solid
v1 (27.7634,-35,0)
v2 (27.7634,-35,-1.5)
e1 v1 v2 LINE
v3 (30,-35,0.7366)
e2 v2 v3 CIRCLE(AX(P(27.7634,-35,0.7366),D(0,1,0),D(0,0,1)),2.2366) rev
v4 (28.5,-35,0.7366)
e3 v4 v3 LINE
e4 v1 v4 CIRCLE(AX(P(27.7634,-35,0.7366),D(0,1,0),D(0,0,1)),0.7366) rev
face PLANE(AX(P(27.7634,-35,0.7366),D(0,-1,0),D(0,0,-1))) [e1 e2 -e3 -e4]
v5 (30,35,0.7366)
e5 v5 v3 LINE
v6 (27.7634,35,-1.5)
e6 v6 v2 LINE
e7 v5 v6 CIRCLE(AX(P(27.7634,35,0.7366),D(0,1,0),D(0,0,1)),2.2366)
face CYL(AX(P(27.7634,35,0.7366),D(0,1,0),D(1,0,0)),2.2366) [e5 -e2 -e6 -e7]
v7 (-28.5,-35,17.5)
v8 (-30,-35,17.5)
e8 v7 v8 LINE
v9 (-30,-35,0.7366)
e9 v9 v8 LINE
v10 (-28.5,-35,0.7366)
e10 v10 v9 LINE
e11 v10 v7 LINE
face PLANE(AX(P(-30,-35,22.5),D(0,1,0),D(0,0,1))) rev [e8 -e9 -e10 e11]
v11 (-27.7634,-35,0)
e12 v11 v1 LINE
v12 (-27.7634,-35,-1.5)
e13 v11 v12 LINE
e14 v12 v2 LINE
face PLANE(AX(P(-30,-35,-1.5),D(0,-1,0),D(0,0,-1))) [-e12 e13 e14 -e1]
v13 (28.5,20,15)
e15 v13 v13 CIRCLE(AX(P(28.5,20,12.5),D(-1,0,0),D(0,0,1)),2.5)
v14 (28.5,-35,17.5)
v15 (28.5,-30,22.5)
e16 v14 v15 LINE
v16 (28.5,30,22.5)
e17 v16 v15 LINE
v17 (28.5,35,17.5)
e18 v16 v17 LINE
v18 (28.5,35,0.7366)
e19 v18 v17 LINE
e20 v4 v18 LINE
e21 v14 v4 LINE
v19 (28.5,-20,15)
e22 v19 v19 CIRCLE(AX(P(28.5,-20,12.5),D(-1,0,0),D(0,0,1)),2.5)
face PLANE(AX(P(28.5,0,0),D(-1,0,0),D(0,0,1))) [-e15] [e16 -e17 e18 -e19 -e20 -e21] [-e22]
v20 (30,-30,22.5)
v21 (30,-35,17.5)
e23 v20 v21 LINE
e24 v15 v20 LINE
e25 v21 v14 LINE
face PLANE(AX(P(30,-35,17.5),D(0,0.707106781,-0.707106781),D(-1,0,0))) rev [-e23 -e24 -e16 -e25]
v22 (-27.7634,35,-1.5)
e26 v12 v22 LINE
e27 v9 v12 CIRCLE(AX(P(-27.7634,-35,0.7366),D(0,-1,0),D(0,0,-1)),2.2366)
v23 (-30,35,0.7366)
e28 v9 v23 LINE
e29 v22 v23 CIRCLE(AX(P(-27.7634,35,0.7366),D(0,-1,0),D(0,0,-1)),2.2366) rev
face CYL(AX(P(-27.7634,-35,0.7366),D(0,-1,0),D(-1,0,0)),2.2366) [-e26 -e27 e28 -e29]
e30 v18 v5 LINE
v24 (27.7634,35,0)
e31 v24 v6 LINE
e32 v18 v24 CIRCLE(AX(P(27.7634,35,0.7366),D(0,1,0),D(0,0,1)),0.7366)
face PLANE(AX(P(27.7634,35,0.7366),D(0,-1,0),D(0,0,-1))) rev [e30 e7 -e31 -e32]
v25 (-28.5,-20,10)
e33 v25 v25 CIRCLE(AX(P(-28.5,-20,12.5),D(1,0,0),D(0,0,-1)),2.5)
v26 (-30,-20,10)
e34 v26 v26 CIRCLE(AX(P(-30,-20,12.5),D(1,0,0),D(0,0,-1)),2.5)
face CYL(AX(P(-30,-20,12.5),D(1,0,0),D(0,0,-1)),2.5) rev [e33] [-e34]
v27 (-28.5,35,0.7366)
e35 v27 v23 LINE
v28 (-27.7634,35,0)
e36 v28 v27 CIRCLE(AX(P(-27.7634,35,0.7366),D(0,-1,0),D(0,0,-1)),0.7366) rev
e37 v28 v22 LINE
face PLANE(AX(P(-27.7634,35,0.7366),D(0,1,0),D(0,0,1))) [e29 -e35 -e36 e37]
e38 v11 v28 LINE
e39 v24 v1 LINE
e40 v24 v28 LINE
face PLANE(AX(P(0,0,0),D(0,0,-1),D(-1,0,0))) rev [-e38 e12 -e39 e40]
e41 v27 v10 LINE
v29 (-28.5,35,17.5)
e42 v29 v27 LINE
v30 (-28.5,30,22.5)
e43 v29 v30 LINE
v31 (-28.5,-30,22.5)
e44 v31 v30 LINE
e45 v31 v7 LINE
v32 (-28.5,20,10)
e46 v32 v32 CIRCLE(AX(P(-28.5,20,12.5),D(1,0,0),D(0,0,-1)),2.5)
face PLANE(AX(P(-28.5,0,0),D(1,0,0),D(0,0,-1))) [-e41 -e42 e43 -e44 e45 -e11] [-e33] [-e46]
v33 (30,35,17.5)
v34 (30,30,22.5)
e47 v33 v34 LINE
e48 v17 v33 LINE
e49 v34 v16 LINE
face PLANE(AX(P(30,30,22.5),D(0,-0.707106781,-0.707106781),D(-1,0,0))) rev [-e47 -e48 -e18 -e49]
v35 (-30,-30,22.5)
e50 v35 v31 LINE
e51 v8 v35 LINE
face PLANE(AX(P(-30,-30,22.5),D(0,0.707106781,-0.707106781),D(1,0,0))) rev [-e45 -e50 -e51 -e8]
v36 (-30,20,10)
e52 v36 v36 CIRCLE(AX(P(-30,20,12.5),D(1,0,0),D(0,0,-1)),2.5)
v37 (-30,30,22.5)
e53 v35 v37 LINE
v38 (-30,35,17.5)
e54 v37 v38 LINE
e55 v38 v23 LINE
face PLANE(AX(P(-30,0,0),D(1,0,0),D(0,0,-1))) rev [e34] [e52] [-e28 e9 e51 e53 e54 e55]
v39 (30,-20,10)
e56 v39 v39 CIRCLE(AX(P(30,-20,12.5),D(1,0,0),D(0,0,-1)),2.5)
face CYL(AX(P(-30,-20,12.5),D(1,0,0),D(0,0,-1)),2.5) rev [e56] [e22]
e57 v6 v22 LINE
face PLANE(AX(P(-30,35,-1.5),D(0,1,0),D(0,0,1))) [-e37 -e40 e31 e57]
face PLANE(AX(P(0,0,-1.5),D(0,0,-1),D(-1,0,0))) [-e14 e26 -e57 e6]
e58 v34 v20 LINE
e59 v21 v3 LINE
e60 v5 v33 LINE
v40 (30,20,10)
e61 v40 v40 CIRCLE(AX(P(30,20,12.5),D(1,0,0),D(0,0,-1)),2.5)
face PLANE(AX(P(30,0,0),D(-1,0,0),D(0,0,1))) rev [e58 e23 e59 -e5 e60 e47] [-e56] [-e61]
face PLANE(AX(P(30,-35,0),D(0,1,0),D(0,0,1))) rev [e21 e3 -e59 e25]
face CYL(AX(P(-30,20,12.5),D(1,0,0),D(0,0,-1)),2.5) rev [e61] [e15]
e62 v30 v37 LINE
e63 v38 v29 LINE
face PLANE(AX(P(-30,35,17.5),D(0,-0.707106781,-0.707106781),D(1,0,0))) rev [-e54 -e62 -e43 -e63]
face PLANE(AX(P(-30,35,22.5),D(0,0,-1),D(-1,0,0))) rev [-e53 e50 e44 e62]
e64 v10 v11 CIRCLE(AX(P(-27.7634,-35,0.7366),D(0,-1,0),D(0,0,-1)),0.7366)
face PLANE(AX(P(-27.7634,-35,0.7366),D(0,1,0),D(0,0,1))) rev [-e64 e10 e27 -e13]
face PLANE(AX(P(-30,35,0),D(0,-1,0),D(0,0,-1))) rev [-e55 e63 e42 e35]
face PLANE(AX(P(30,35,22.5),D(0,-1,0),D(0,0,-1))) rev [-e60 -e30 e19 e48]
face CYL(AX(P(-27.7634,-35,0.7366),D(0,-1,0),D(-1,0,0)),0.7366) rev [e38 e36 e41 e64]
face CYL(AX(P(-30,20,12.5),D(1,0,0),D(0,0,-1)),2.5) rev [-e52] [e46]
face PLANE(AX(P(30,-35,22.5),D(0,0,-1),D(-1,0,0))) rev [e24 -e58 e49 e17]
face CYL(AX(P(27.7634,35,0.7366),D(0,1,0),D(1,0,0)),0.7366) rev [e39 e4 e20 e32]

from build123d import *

# Parameters (mm, degrees)
CROQUIS1_W                         = 60
CROQUIS1_H                         = 70
BRIDA_BASE1_DEPTH                  = 1.5
BRIDA_DE_ARISTA1_STRIP_W           = 7.4732
BRIDA_DE_ARISTA1_STRIP_H           = 1.5
BRIDA_DE_ARISTA1_STRIP_CUT_DEPTH   = 70
BRIDA_DE_ARISTA1_STRIP_2_W         = 7.4732
BRIDA_DE_ARISTA1_STRIP_2_H         = 1.5
BRIDA_DE_ARISTA1_STRIP_CUT_2_DEPTH = 70
BRIDA_DE_ARISTA1_DEPTH             = 70
BRIDA_DE_ARISTA1_BEND_DEPTH        = 70
ROMPER_START                       = -40.658639918
ROMPER_ESQUINA1_OUTLINE_W          = 64
ROMPER_ESQUINA1_OUTLINE_H          = 51.123106012
ROMPER_ESQUINA1_DEPTH              = 3.535533906
ROMPER_START_2                     = 5.303300859
ROMPER_ESQUINA1_2_OUTLINE_W        = 64
ROMPER_ESQUINA1_2_OUTLINE_H        = 3.876893988
ROMPER_ESQUINA1_2_DEPTH            = 7.071067812
CROQUIS16_R                        = 2.5
CORTAR_EXTRUIR1_DEPTH              = 74.015409333


# Read off the part's stored shape, not the designer's step: Romper esquina1
# Sheet-metal steps are written as plain solids
with BuildPart() as part:
    # Croquis1 → Brida base1 (new body)
    with BuildSketch(Plane.XY):
        Rectangle(CROQUIS1_W, CROQUIS1_H)
    extrude(amount=-BRIDA_BASE1_DEPTH)

    # Brida de arista1 strip (across the edge) → Brida de arista1 strip cut (cut)
    with BuildSketch(Plane(origin=(-30, 35, 0), x_dir=(1, 0, 0), z_dir=(0, -1, 0))):
        with Locations((-1.5, -0.75)):
            Rectangle(BRIDA_DE_ARISTA1_STRIP_W, BRIDA_DE_ARISTA1_STRIP_H)
    extrude(amount=BRIDA_DE_ARISTA1_STRIP_CUT_DEPTH, mode=Mode.SUBTRACT)

    # Brida de arista1 strip 2 (across the edge) → Brida de arista1 strip cut 2 (cut)
    with BuildSketch(Plane(origin=(30, -35, 0), x_dir=(-1, 0, 0), z_dir=(0, 1, 0))):
        with Locations((-1.5, -0.75)):
            Rectangle(BRIDA_DE_ARISTA1_STRIP_2_W, BRIDA_DE_ARISTA1_STRIP_2_H)
    extrude(amount=BRIDA_DE_ARISTA1_STRIP_CUT_2_DEPTH, mode=Mode.SUBTRACT)

    # Brida de arista1 section (across the edge) → Brida de arista1 (add)
    with BuildSketch(Plane(origin=(-30, 35, 0), x_dir=(1, 0, 0), z_dir=(0, -1, 0))):
        with BuildLine():
            Line((0, 0.7366), (0, 22.5))
            Line((0, 22.5), (1.5, 22.5))
            Line((1.5, 22.5), (1.5, 0.7366))
            ThreePointArc((1.5, 0.7366), (1.715745145, 0.215745145), (2.2366, 0))
            Line((2.2366, 0), (2.2366, -1.5))
            ThreePointArc((2.2366, -1.5), (0.655084973, -0.844915027), (0, 0.7366))
        make_face()
    extrude(amount=BRIDA_DE_ARISTA1_DEPTH)

    # Brida de arista1 section 2 (across the edge) → Brida de arista1 bend (add)
    with BuildSketch(Plane(origin=(30, -35, 0), x_dir=(-1, 0, 0), z_dir=(0, 1, 0))):
        with BuildLine():
            Line((0, 0.7366), (0, 22.5))
            Line((0, 22.5), (1.5, 22.5))
            Line((1.5, 22.5), (1.5, 0.7366))
            ThreePointArc((1.5, 0.7366), (1.715745145, 0.215745145), (2.2366, 0))
            Line((2.2366, 0), (2.2366, -1.5))
            ThreePointArc((2.2366, -1.5), (0.655084973, -0.844915027), (0, 0.7366))
        make_face()
    extrude(amount=BRIDA_DE_ARISTA1_BEND_DEPTH)

    # Romper esquina1 outline → Romper esquina1 (cut)
    with BuildSketch(Plane(origin=(0, 0, 0), x_dir=(1, 0, 0), z_dir=(0, 0.707106781186548, -0.707106781186547)).offset(ROMPER_START)):
        with Locations((0, -11.561553006)):
            Rectangle(ROMPER_ESQUINA1_OUTLINE_W, ROMPER_ESQUINA1_OUTLINE_H)
    extrude(amount=ROMPER_ESQUINA1_DEPTH, mode=Mode.SUBTRACT)

    # Romper esquina1 2 outline → Romper esquina1 2 (cut)
    with BuildSketch(Plane(origin=(0, 0, 0), x_dir=(1, 0, 0), z_dir=(0, 0.707106781186548, -0.707106781186547)).offset(ROMPER_START_2)):
        with Locations((0, -39.061553006)):
            Rectangle(ROMPER_ESQUINA1_2_OUTLINE_W, ROMPER_ESQUINA1_2_OUTLINE_H)
    extrude(amount=ROMPER_ESQUINA1_2_DEPTH, mode=Mode.SUBTRACT)

    # Croquis16 → Cortar-Extruir1 (cut, through all)
    with BuildSketch(Plane(origin=(30, 0, 0), x_dir=(0, 0, -1), z_dir=(1, 0, 0))):
        with Locations((-12.5, -20)):
            Circle(CROQUIS16_R)
        with Locations((-12.5, 20)):
            Circle(CROQUIS16_R)
    extrude(amount=-CORTAR_EXTRUIR1_DEPTH, mode=Mode.SUBTRACT)


solid = part.part
